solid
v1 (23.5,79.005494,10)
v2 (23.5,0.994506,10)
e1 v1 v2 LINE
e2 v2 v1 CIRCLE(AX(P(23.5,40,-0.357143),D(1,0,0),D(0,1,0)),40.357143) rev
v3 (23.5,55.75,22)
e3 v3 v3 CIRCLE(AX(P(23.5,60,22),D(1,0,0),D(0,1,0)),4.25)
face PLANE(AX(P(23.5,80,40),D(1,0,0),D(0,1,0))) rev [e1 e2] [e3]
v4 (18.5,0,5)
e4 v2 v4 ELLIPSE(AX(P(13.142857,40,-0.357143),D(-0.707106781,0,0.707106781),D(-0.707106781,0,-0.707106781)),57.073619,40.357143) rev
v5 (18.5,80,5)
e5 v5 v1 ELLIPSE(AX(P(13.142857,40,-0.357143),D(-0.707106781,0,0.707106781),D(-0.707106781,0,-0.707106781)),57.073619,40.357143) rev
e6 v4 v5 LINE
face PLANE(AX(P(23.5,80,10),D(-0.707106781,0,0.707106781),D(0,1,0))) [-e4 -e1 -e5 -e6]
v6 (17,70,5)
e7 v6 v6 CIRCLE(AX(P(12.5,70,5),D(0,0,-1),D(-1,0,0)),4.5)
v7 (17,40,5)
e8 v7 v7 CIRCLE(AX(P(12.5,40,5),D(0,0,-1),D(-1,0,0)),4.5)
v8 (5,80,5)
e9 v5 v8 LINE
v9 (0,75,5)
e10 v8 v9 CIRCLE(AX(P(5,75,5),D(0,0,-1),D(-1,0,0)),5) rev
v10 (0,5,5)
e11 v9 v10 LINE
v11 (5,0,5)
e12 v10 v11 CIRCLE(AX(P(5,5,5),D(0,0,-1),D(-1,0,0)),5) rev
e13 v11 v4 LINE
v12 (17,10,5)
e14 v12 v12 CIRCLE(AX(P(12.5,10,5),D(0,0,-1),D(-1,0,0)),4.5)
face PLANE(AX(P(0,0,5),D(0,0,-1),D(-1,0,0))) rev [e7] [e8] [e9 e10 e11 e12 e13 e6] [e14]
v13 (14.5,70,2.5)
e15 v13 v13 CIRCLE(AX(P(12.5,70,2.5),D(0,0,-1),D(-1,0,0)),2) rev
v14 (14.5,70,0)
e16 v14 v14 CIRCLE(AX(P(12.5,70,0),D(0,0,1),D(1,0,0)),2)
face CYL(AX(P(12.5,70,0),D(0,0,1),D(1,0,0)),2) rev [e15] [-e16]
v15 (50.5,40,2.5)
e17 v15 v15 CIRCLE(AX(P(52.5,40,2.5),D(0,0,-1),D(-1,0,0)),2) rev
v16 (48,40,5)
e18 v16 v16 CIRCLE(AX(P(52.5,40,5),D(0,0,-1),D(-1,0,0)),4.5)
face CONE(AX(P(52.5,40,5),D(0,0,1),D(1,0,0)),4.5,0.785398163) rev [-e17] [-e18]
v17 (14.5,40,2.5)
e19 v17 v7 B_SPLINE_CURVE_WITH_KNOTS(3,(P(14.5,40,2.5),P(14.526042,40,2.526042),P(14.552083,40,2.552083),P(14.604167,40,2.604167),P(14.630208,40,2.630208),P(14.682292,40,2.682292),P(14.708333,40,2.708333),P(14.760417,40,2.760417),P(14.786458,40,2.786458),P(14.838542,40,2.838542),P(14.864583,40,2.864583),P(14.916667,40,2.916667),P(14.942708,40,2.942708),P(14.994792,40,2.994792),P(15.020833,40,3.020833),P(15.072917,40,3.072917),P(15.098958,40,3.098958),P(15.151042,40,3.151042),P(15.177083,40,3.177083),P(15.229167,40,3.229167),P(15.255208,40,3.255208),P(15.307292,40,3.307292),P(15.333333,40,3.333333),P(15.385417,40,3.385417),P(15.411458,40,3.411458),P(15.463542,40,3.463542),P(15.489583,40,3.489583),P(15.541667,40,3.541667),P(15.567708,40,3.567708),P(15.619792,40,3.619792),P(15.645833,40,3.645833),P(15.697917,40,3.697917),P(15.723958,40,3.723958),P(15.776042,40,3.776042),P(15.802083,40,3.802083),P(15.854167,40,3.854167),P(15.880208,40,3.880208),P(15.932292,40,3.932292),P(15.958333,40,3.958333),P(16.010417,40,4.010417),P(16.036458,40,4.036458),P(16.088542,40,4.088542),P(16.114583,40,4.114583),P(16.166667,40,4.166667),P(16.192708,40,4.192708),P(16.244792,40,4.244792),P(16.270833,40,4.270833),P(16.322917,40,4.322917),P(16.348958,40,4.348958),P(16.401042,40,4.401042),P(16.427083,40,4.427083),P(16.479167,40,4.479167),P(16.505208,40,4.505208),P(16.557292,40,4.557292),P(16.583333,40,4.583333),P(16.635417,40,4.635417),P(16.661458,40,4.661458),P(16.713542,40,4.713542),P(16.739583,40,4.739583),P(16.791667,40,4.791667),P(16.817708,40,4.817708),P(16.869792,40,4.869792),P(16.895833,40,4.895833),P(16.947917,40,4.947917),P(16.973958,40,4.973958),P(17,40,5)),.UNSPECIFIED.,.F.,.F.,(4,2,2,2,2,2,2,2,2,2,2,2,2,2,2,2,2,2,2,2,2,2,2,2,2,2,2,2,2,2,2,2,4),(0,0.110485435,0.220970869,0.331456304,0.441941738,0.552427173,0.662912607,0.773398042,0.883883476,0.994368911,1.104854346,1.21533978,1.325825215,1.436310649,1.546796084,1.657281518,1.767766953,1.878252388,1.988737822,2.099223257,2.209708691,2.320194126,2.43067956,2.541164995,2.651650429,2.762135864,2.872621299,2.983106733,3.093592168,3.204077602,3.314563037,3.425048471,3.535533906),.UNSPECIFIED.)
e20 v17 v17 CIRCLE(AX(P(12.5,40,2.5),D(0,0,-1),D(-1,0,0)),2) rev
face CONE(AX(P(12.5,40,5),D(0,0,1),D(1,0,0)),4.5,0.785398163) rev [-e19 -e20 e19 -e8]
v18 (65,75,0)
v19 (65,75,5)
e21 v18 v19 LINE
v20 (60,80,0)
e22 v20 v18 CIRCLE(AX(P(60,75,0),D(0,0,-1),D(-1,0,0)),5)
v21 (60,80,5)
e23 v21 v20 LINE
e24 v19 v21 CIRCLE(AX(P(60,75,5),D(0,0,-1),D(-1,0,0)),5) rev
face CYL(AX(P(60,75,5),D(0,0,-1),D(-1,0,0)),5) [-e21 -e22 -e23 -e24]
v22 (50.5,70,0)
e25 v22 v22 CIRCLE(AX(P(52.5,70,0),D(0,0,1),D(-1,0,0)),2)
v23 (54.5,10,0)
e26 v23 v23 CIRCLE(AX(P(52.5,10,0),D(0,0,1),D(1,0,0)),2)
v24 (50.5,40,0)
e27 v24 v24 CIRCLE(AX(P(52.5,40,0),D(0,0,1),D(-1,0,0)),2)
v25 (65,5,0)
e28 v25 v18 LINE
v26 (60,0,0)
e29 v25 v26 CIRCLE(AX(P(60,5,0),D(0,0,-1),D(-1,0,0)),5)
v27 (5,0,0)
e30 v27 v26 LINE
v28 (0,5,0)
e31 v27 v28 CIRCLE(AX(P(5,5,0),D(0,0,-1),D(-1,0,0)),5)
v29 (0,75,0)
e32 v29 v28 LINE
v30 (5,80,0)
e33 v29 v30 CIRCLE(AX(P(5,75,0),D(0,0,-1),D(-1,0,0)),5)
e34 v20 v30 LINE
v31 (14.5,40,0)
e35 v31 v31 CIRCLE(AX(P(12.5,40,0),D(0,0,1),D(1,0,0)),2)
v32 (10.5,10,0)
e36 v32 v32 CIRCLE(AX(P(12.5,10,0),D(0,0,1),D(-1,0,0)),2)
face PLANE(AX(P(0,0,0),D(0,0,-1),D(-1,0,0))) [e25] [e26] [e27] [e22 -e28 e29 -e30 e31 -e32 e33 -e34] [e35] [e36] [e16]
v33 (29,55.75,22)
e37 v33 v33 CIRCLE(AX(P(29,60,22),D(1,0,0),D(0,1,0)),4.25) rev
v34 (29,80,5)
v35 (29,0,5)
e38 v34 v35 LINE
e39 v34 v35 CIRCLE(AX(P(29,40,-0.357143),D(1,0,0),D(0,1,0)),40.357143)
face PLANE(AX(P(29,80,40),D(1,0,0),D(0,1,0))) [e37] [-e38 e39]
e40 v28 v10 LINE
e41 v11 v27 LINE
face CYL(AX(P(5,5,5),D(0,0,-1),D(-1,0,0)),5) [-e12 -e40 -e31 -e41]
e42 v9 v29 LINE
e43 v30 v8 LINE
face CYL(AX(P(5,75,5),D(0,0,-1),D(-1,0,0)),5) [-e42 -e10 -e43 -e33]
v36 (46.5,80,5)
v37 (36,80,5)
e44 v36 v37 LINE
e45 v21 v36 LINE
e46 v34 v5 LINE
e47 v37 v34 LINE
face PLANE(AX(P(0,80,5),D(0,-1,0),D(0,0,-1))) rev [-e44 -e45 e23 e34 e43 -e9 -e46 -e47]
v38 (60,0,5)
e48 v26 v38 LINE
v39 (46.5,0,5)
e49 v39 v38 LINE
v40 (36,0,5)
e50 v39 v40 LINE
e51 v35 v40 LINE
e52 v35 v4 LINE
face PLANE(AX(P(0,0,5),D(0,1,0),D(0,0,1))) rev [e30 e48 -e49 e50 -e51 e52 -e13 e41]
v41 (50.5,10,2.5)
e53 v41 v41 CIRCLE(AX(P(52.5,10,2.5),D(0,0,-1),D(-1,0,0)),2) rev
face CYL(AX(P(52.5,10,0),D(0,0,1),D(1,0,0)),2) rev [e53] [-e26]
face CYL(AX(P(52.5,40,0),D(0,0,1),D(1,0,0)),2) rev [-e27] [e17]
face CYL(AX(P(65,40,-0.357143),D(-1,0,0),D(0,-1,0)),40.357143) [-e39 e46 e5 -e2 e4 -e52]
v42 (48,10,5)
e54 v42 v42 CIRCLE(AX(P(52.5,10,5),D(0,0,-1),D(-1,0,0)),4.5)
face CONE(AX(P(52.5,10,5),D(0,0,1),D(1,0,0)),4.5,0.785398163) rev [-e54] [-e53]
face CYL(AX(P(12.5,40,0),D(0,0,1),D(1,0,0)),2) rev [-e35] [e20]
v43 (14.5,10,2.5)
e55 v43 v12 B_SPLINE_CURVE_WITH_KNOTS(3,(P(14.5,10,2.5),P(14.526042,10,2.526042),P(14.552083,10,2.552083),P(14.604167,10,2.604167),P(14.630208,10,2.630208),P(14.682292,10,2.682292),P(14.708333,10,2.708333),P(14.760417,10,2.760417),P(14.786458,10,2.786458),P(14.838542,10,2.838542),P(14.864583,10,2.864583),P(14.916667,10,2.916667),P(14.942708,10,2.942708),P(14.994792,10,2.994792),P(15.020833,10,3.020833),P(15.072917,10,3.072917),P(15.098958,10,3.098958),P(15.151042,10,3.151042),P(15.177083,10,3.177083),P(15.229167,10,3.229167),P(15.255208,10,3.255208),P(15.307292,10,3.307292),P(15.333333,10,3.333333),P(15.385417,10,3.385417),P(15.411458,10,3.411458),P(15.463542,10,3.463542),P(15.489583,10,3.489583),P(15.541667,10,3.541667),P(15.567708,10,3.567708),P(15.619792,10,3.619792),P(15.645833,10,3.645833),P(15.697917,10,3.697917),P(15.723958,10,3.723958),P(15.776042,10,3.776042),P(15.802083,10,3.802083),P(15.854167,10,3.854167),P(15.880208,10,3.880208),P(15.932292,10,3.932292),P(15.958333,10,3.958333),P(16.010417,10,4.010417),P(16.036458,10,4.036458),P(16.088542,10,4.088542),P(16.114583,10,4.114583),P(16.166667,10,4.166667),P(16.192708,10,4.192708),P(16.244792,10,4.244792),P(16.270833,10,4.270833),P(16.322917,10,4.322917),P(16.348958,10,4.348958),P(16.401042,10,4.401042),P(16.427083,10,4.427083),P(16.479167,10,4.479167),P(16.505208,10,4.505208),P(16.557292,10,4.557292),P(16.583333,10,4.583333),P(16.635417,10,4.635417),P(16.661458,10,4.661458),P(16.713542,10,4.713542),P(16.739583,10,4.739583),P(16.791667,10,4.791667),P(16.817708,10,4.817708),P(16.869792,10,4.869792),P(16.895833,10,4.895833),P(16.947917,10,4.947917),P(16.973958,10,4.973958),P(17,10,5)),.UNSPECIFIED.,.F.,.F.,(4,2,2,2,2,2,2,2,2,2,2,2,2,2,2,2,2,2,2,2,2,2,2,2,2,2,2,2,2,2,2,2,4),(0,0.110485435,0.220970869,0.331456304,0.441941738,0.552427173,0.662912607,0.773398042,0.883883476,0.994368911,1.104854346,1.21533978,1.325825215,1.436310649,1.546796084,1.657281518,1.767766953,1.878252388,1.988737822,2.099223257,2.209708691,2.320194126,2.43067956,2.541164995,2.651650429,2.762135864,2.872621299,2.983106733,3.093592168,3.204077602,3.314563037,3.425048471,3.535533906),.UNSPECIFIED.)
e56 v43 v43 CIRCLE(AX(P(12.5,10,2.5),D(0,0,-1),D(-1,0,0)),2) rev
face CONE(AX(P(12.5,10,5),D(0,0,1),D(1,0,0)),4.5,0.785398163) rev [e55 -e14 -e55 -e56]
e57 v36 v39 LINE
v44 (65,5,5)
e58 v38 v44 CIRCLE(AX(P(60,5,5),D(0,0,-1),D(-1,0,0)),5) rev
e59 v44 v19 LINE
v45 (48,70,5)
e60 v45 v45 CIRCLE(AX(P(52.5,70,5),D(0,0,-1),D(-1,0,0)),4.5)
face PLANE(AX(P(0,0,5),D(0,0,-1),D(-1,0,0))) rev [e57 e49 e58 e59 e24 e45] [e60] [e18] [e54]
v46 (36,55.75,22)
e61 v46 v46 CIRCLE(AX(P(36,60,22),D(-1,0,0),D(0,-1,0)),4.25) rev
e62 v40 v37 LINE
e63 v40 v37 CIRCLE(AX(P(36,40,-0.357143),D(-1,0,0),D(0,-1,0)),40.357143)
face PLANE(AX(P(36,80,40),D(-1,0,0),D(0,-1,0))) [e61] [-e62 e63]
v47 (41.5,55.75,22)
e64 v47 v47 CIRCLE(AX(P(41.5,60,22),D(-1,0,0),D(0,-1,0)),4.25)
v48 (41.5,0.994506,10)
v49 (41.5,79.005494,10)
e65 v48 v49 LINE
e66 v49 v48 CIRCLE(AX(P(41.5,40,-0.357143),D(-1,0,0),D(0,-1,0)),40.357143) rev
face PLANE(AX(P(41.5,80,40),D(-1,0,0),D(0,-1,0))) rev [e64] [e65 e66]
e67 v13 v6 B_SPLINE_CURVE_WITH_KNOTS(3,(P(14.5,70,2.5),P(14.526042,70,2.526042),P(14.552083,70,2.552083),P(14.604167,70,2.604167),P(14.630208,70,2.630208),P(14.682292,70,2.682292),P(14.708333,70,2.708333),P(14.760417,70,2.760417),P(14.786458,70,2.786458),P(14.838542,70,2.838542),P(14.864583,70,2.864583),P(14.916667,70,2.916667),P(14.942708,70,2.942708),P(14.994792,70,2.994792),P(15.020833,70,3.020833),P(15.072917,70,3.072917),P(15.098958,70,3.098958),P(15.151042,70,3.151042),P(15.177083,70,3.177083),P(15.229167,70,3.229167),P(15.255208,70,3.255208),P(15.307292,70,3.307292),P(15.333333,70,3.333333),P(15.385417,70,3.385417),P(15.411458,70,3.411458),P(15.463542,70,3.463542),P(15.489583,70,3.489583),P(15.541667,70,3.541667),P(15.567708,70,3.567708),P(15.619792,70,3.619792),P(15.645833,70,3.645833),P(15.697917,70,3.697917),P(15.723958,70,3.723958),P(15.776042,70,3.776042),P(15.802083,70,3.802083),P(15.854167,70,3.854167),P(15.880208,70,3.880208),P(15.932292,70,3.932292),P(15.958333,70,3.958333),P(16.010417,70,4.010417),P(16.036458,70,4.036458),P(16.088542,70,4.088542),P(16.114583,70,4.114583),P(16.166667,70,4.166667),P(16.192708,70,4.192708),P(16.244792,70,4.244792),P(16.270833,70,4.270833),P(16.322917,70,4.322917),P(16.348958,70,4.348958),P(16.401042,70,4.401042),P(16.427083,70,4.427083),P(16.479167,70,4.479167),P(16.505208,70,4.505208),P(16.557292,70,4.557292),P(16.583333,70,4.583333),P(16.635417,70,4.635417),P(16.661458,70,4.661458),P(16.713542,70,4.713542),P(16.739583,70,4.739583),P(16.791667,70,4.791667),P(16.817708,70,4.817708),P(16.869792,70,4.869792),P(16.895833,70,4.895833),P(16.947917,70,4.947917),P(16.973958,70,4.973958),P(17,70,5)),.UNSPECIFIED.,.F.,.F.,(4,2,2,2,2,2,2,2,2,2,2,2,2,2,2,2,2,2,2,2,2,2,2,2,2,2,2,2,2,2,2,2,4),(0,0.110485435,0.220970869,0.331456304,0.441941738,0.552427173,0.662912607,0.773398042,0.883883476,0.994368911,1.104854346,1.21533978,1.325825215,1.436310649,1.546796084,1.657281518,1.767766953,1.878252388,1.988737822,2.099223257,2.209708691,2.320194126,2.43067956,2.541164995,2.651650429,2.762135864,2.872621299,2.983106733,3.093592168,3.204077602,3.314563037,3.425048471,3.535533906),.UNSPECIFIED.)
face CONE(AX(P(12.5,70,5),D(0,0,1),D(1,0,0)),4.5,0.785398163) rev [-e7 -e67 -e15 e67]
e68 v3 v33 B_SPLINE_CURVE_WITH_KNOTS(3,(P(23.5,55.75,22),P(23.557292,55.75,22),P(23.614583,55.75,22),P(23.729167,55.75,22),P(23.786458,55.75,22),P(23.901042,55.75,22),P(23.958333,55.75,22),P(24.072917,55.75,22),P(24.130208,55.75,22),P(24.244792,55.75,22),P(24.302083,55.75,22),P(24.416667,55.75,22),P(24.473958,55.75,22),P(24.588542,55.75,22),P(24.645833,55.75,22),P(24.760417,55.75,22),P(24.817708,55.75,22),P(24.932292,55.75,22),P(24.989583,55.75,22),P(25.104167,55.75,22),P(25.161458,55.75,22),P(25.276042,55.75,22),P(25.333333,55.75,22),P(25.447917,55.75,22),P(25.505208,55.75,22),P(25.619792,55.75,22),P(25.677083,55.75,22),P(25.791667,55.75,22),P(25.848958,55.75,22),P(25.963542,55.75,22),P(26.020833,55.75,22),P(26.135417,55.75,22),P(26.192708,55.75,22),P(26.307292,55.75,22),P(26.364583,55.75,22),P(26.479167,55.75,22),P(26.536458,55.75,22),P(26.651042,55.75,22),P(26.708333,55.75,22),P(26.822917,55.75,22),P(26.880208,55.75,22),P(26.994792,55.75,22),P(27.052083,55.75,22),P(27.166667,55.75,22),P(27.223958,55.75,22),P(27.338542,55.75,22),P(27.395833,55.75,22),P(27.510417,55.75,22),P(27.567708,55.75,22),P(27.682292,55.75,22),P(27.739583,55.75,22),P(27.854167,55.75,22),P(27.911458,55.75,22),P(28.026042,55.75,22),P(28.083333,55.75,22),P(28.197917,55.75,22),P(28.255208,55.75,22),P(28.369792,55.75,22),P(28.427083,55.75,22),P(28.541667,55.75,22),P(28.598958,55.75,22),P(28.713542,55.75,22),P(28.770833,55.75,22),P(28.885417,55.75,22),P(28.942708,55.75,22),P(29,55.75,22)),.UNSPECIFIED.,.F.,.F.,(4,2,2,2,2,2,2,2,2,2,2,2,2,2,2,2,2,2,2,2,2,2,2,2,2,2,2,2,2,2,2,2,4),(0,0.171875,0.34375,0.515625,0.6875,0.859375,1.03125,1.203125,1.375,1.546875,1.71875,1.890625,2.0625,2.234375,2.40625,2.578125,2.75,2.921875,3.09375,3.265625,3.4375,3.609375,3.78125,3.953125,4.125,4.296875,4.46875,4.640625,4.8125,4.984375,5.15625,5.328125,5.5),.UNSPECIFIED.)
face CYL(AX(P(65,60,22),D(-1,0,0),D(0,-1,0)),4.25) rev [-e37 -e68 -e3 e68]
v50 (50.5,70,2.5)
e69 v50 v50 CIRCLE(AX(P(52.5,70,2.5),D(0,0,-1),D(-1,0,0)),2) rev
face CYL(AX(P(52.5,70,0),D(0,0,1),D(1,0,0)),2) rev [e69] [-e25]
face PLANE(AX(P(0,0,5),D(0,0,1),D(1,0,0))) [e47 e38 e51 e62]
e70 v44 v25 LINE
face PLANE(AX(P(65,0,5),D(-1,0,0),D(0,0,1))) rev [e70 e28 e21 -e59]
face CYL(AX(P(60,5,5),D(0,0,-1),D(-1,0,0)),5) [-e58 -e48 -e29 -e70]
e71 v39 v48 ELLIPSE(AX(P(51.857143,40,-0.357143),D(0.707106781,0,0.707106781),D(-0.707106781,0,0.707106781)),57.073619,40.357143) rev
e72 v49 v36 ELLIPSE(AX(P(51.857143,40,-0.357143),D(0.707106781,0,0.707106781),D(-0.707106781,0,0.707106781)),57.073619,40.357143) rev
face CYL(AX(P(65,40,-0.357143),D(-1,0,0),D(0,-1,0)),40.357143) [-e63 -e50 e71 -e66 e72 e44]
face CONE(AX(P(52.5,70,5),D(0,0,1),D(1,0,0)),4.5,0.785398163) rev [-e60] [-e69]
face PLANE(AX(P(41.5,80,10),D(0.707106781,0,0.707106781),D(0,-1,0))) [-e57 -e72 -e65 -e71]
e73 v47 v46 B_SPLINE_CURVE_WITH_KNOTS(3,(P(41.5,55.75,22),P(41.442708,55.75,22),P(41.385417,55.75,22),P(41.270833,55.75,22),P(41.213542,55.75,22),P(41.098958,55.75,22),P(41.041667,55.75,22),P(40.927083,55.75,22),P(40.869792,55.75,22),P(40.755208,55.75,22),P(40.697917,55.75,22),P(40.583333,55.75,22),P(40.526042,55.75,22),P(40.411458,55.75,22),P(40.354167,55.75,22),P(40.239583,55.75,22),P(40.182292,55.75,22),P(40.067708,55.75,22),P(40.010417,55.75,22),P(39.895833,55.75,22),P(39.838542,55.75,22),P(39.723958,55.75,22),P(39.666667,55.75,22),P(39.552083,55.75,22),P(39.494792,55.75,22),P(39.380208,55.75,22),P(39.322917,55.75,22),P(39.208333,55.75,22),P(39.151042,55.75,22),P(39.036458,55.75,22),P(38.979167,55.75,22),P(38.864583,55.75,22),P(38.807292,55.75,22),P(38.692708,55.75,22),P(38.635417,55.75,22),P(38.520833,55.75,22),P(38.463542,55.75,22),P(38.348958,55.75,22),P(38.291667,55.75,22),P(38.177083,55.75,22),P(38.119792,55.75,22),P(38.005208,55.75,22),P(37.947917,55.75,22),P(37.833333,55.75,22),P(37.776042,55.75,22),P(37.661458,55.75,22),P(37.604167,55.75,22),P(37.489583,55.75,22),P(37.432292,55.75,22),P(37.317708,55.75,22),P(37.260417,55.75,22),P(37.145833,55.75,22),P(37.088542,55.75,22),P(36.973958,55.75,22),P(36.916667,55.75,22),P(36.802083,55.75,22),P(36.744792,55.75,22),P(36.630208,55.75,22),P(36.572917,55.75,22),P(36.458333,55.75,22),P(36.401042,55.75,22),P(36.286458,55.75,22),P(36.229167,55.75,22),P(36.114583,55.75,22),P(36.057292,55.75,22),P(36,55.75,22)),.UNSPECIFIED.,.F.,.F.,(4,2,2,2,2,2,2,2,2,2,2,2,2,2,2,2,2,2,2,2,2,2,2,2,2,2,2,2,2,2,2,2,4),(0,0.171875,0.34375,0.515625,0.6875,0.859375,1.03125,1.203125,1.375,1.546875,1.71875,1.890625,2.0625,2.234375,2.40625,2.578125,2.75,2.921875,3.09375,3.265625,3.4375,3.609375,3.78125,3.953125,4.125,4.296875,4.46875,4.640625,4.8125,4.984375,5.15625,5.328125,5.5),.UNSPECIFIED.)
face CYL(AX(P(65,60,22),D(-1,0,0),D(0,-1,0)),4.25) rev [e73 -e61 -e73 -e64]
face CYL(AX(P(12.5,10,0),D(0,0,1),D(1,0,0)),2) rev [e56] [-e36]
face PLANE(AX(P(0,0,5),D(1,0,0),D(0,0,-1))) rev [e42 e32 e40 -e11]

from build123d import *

# Parameters (mm, degrees)
ESQUISSE1_W                  = 65
ESQUISSE1_H                  = 80
BOSS_EXTRU_1_DEPTH           = 5
ENL_V_MAT_EXTRU_1_DEPTH      = 104.198837203
ENL_V_MAT_EXTRU_1_DEPTH_BACK = 104.198837203
ESQUISSE2_R                  = 2
ESQUISSE3_W                  = 18
ESQUISSE3_H                  = 80
BOSS_EXTRU_2_DEPTH           = 35
ENL_V_MAT_EXTRU_2_DEPTH      = 99.601470577
ENL_V_MAT_EXTRU_2_DEPTH_BACK = 99.601470577
ENL_V_MAT_EXTRU_3_DEPTH      = 99.601470577
ENL_V_MAT_EXTRU_3_DEPTH_BACK = 99.601470577
ESQUISSE5_R                  = 4.25
ESQUISSE6_W                  = 7
ESQUISSE6_H                  = 80
ENL_V_MAT_EXTRU_4_DEPTH      = 109.857705285
CHANFREIN1_SIZE              = 5
CHANFREIN2_SIZE              = 2.5
CONG_1_R                     = 5


with BuildPart() as part:
    # Esquisse1 → Boss.-Extru.1 (new body)
    with BuildSketch(Plane.XY):
        with Locations((32.5, 40)):
            Rectangle(ESQUISSE1_W, ESQUISSE1_H)
    extrude(amount=BOSS_EXTRU_1_DEPTH)

    # Esquisse2 → Enlèv. mat.-Extru.1 (cut, two sides: drawn at the far end of the back side and taken through both)
    with BuildSketch(Plane.XY.offset(5).offset(-ENL_V_MAT_EXTRU_1_DEPTH_BACK)):
        with Locations((12.5, 70)):
            Circle(ESQUISSE2_R)
        with Locations(Location((12.5, 10, 0), (0, 0, 180))):
            Circle(ESQUISSE2_R)
        with Locations((12.5, 40)):
            Circle(ESQUISSE2_R)
        with Locations(Location((52.5, 40, 0), (0, 0, 180))):
            Circle(ESQUISSE2_R)
        with Locations((52.5, 10)):
            Circle(ESQUISSE2_R)
        with Locations(Location((52.5, 70, 0), (0, 0, 180))):
            Circle(ESQUISSE2_R)
    extrude(amount=ENL_V_MAT_EXTRU_1_DEPTH + ENL_V_MAT_EXTRU_1_DEPTH_BACK, mode=Mode.SUBTRACT)

    # Esquisse3 → Boss.-Extru.2 (add)
    with BuildSketch(Plane.XY.offset(5)):
        with Locations((32.5, 40)):
            Rectangle(ESQUISSE3_W, ESQUISSE3_H)
    extrude(amount=BOSS_EXTRU_2_DEPTH)

    # Esquisse4 → Enlèv. mat.-Extru.2 (cut, two sides: drawn at the far end of the back side and taken through both)
    with BuildSketch(Plane.ZY.offset(-23.5).offset(-ENL_V_MAT_EXTRU_2_DEPTH_BACK)):
        with BuildLine():
            Line((5, 80), (41, 80))
            Line((41, 80), (41, 0))
            Line((41, 0), (5, 0))
            ThreePointArc((5, 0), (40, 40), (5, 80))
        make_face()
    extrude(amount=ENL_V_MAT_EXTRU_2_DEPTH + ENL_V_MAT_EXTRU_2_DEPTH_BACK, mode=Mode.SUBTRACT)

    # Esquisse5 → Enlèv. mat.-Extru.3 (cut, two sides: drawn at the far end of the back side and taken through both)
    with BuildSketch(Plane.ZY.offset(-23.5).offset(-ENL_V_MAT_EXTRU_3_DEPTH_BACK)):
        with Locations(Location((22, 60, 0), (0, 0, 270))):
            Circle(ESQUISSE5_R)
    extrude(amount=ENL_V_MAT_EXTRU_3_DEPTH + ENL_V_MAT_EXTRU_3_DEPTH_BACK, mode=Mode.SUBTRACT)

    # Esquisse6 → Enlèv. mat.-Extru.4 (cut, through all)
    with BuildSketch(Plane.XY.offset(5)):
        with Locations((32.5, 40)):
            Rectangle(ESQUISSE6_W, ESQUISSE6_H)
    extrude(amount=ENL_V_MAT_EXTRU_4_DEPTH, mode=Mode.SUBTRACT)

    # Chanfrein1
    # the kernel refuses this chamfer: 5 mm, written as the material it adds along each edge
    with BuildSketch(Plane(origin=(41.5, 0, 5), x_dir=(0.9996219169112968, 0, -0.027495876610586317), z_dir=(0, 1, 0))) as chanfrein1_piece_1_section:
        Polygon((CHANFREIN1_SIZE * 0.999621916911, -CHANFREIN1_SIZE * 0.0274958766106), (-CHANFREIN1_SIZE * 0.0274958766106, -CHANFREIN1_SIZE * 0.999621916911), (0, 0), align=None)
    chanfrein1_piece_1 = extrude(amount=80, mode=Mode.PRIVATE)
    chanfrein1_piece_1 = chanfrein1_piece_1 & Plane(origin=(43.152902744, 40, -0.357142857), x_dir=(0, -0.9911504424778762, 0.13274336283185842), z_dir=(1, 0, 0)) * Cylinder(40.357142857, 180, mode=Mode.PRIVATE)
    add(chanfrein1_piece_1)
    with BuildSketch(Plane(origin=(23.5, 80, 5), x_dir=(-0.9996219169112968, 0, -0.027495876610586317), z_dir=(0, -1, 0))) as chanfrein1_piece_2_section:
        Polygon((CHANFREIN1_SIZE * 0.999621916911, -CHANFREIN1_SIZE * 0.0274958766106), (-CHANFREIN1_SIZE * 0.0274958766106, -CHANFREIN1_SIZE * 0.999621916911), (0, 0), align=None)
    chanfrein1_piece_2 = extrude(amount=80, mode=Mode.PRIVATE)
    chanfrein1_piece_2 = chanfrein1_piece_2 & Plane(origin=(21.847097256, 40, -0.357142857), x_dir=(0, -0.9911504424778762, 0.13274336283185842), z_dir=(1, 0, 0)) * Cylinder(40.357142857, 180, mode=Mode.PRIVATE)
    add(chanfrein1_piece_2)

    # Chanfrein2
    chanfrein2_edges = [part.edges().sort_by_distance(p)[0] for p in [
        (10.5, 70, 5),
        (14.5, 10, 5),
        (10.5, 40, 5),
        (54.5, 70, 5),
        (50.5, 10, 5),
        (54.5, 40, 5),
    ]]
    chamfer(chanfrein2_edges, length=CHANFREIN2_SIZE)

    # Congé1
    cong_1_edges = [part.edges().sort_by_distance(p)[0] for p in [
        (0, 80, 2.5),
        (65, 80, 2.5),
        (65, 0, 2.5),
        (0, 0, 2.5),
    ]]
    fillet(cong_1_edges, radius=CONG_1_R)


solid = part.part
